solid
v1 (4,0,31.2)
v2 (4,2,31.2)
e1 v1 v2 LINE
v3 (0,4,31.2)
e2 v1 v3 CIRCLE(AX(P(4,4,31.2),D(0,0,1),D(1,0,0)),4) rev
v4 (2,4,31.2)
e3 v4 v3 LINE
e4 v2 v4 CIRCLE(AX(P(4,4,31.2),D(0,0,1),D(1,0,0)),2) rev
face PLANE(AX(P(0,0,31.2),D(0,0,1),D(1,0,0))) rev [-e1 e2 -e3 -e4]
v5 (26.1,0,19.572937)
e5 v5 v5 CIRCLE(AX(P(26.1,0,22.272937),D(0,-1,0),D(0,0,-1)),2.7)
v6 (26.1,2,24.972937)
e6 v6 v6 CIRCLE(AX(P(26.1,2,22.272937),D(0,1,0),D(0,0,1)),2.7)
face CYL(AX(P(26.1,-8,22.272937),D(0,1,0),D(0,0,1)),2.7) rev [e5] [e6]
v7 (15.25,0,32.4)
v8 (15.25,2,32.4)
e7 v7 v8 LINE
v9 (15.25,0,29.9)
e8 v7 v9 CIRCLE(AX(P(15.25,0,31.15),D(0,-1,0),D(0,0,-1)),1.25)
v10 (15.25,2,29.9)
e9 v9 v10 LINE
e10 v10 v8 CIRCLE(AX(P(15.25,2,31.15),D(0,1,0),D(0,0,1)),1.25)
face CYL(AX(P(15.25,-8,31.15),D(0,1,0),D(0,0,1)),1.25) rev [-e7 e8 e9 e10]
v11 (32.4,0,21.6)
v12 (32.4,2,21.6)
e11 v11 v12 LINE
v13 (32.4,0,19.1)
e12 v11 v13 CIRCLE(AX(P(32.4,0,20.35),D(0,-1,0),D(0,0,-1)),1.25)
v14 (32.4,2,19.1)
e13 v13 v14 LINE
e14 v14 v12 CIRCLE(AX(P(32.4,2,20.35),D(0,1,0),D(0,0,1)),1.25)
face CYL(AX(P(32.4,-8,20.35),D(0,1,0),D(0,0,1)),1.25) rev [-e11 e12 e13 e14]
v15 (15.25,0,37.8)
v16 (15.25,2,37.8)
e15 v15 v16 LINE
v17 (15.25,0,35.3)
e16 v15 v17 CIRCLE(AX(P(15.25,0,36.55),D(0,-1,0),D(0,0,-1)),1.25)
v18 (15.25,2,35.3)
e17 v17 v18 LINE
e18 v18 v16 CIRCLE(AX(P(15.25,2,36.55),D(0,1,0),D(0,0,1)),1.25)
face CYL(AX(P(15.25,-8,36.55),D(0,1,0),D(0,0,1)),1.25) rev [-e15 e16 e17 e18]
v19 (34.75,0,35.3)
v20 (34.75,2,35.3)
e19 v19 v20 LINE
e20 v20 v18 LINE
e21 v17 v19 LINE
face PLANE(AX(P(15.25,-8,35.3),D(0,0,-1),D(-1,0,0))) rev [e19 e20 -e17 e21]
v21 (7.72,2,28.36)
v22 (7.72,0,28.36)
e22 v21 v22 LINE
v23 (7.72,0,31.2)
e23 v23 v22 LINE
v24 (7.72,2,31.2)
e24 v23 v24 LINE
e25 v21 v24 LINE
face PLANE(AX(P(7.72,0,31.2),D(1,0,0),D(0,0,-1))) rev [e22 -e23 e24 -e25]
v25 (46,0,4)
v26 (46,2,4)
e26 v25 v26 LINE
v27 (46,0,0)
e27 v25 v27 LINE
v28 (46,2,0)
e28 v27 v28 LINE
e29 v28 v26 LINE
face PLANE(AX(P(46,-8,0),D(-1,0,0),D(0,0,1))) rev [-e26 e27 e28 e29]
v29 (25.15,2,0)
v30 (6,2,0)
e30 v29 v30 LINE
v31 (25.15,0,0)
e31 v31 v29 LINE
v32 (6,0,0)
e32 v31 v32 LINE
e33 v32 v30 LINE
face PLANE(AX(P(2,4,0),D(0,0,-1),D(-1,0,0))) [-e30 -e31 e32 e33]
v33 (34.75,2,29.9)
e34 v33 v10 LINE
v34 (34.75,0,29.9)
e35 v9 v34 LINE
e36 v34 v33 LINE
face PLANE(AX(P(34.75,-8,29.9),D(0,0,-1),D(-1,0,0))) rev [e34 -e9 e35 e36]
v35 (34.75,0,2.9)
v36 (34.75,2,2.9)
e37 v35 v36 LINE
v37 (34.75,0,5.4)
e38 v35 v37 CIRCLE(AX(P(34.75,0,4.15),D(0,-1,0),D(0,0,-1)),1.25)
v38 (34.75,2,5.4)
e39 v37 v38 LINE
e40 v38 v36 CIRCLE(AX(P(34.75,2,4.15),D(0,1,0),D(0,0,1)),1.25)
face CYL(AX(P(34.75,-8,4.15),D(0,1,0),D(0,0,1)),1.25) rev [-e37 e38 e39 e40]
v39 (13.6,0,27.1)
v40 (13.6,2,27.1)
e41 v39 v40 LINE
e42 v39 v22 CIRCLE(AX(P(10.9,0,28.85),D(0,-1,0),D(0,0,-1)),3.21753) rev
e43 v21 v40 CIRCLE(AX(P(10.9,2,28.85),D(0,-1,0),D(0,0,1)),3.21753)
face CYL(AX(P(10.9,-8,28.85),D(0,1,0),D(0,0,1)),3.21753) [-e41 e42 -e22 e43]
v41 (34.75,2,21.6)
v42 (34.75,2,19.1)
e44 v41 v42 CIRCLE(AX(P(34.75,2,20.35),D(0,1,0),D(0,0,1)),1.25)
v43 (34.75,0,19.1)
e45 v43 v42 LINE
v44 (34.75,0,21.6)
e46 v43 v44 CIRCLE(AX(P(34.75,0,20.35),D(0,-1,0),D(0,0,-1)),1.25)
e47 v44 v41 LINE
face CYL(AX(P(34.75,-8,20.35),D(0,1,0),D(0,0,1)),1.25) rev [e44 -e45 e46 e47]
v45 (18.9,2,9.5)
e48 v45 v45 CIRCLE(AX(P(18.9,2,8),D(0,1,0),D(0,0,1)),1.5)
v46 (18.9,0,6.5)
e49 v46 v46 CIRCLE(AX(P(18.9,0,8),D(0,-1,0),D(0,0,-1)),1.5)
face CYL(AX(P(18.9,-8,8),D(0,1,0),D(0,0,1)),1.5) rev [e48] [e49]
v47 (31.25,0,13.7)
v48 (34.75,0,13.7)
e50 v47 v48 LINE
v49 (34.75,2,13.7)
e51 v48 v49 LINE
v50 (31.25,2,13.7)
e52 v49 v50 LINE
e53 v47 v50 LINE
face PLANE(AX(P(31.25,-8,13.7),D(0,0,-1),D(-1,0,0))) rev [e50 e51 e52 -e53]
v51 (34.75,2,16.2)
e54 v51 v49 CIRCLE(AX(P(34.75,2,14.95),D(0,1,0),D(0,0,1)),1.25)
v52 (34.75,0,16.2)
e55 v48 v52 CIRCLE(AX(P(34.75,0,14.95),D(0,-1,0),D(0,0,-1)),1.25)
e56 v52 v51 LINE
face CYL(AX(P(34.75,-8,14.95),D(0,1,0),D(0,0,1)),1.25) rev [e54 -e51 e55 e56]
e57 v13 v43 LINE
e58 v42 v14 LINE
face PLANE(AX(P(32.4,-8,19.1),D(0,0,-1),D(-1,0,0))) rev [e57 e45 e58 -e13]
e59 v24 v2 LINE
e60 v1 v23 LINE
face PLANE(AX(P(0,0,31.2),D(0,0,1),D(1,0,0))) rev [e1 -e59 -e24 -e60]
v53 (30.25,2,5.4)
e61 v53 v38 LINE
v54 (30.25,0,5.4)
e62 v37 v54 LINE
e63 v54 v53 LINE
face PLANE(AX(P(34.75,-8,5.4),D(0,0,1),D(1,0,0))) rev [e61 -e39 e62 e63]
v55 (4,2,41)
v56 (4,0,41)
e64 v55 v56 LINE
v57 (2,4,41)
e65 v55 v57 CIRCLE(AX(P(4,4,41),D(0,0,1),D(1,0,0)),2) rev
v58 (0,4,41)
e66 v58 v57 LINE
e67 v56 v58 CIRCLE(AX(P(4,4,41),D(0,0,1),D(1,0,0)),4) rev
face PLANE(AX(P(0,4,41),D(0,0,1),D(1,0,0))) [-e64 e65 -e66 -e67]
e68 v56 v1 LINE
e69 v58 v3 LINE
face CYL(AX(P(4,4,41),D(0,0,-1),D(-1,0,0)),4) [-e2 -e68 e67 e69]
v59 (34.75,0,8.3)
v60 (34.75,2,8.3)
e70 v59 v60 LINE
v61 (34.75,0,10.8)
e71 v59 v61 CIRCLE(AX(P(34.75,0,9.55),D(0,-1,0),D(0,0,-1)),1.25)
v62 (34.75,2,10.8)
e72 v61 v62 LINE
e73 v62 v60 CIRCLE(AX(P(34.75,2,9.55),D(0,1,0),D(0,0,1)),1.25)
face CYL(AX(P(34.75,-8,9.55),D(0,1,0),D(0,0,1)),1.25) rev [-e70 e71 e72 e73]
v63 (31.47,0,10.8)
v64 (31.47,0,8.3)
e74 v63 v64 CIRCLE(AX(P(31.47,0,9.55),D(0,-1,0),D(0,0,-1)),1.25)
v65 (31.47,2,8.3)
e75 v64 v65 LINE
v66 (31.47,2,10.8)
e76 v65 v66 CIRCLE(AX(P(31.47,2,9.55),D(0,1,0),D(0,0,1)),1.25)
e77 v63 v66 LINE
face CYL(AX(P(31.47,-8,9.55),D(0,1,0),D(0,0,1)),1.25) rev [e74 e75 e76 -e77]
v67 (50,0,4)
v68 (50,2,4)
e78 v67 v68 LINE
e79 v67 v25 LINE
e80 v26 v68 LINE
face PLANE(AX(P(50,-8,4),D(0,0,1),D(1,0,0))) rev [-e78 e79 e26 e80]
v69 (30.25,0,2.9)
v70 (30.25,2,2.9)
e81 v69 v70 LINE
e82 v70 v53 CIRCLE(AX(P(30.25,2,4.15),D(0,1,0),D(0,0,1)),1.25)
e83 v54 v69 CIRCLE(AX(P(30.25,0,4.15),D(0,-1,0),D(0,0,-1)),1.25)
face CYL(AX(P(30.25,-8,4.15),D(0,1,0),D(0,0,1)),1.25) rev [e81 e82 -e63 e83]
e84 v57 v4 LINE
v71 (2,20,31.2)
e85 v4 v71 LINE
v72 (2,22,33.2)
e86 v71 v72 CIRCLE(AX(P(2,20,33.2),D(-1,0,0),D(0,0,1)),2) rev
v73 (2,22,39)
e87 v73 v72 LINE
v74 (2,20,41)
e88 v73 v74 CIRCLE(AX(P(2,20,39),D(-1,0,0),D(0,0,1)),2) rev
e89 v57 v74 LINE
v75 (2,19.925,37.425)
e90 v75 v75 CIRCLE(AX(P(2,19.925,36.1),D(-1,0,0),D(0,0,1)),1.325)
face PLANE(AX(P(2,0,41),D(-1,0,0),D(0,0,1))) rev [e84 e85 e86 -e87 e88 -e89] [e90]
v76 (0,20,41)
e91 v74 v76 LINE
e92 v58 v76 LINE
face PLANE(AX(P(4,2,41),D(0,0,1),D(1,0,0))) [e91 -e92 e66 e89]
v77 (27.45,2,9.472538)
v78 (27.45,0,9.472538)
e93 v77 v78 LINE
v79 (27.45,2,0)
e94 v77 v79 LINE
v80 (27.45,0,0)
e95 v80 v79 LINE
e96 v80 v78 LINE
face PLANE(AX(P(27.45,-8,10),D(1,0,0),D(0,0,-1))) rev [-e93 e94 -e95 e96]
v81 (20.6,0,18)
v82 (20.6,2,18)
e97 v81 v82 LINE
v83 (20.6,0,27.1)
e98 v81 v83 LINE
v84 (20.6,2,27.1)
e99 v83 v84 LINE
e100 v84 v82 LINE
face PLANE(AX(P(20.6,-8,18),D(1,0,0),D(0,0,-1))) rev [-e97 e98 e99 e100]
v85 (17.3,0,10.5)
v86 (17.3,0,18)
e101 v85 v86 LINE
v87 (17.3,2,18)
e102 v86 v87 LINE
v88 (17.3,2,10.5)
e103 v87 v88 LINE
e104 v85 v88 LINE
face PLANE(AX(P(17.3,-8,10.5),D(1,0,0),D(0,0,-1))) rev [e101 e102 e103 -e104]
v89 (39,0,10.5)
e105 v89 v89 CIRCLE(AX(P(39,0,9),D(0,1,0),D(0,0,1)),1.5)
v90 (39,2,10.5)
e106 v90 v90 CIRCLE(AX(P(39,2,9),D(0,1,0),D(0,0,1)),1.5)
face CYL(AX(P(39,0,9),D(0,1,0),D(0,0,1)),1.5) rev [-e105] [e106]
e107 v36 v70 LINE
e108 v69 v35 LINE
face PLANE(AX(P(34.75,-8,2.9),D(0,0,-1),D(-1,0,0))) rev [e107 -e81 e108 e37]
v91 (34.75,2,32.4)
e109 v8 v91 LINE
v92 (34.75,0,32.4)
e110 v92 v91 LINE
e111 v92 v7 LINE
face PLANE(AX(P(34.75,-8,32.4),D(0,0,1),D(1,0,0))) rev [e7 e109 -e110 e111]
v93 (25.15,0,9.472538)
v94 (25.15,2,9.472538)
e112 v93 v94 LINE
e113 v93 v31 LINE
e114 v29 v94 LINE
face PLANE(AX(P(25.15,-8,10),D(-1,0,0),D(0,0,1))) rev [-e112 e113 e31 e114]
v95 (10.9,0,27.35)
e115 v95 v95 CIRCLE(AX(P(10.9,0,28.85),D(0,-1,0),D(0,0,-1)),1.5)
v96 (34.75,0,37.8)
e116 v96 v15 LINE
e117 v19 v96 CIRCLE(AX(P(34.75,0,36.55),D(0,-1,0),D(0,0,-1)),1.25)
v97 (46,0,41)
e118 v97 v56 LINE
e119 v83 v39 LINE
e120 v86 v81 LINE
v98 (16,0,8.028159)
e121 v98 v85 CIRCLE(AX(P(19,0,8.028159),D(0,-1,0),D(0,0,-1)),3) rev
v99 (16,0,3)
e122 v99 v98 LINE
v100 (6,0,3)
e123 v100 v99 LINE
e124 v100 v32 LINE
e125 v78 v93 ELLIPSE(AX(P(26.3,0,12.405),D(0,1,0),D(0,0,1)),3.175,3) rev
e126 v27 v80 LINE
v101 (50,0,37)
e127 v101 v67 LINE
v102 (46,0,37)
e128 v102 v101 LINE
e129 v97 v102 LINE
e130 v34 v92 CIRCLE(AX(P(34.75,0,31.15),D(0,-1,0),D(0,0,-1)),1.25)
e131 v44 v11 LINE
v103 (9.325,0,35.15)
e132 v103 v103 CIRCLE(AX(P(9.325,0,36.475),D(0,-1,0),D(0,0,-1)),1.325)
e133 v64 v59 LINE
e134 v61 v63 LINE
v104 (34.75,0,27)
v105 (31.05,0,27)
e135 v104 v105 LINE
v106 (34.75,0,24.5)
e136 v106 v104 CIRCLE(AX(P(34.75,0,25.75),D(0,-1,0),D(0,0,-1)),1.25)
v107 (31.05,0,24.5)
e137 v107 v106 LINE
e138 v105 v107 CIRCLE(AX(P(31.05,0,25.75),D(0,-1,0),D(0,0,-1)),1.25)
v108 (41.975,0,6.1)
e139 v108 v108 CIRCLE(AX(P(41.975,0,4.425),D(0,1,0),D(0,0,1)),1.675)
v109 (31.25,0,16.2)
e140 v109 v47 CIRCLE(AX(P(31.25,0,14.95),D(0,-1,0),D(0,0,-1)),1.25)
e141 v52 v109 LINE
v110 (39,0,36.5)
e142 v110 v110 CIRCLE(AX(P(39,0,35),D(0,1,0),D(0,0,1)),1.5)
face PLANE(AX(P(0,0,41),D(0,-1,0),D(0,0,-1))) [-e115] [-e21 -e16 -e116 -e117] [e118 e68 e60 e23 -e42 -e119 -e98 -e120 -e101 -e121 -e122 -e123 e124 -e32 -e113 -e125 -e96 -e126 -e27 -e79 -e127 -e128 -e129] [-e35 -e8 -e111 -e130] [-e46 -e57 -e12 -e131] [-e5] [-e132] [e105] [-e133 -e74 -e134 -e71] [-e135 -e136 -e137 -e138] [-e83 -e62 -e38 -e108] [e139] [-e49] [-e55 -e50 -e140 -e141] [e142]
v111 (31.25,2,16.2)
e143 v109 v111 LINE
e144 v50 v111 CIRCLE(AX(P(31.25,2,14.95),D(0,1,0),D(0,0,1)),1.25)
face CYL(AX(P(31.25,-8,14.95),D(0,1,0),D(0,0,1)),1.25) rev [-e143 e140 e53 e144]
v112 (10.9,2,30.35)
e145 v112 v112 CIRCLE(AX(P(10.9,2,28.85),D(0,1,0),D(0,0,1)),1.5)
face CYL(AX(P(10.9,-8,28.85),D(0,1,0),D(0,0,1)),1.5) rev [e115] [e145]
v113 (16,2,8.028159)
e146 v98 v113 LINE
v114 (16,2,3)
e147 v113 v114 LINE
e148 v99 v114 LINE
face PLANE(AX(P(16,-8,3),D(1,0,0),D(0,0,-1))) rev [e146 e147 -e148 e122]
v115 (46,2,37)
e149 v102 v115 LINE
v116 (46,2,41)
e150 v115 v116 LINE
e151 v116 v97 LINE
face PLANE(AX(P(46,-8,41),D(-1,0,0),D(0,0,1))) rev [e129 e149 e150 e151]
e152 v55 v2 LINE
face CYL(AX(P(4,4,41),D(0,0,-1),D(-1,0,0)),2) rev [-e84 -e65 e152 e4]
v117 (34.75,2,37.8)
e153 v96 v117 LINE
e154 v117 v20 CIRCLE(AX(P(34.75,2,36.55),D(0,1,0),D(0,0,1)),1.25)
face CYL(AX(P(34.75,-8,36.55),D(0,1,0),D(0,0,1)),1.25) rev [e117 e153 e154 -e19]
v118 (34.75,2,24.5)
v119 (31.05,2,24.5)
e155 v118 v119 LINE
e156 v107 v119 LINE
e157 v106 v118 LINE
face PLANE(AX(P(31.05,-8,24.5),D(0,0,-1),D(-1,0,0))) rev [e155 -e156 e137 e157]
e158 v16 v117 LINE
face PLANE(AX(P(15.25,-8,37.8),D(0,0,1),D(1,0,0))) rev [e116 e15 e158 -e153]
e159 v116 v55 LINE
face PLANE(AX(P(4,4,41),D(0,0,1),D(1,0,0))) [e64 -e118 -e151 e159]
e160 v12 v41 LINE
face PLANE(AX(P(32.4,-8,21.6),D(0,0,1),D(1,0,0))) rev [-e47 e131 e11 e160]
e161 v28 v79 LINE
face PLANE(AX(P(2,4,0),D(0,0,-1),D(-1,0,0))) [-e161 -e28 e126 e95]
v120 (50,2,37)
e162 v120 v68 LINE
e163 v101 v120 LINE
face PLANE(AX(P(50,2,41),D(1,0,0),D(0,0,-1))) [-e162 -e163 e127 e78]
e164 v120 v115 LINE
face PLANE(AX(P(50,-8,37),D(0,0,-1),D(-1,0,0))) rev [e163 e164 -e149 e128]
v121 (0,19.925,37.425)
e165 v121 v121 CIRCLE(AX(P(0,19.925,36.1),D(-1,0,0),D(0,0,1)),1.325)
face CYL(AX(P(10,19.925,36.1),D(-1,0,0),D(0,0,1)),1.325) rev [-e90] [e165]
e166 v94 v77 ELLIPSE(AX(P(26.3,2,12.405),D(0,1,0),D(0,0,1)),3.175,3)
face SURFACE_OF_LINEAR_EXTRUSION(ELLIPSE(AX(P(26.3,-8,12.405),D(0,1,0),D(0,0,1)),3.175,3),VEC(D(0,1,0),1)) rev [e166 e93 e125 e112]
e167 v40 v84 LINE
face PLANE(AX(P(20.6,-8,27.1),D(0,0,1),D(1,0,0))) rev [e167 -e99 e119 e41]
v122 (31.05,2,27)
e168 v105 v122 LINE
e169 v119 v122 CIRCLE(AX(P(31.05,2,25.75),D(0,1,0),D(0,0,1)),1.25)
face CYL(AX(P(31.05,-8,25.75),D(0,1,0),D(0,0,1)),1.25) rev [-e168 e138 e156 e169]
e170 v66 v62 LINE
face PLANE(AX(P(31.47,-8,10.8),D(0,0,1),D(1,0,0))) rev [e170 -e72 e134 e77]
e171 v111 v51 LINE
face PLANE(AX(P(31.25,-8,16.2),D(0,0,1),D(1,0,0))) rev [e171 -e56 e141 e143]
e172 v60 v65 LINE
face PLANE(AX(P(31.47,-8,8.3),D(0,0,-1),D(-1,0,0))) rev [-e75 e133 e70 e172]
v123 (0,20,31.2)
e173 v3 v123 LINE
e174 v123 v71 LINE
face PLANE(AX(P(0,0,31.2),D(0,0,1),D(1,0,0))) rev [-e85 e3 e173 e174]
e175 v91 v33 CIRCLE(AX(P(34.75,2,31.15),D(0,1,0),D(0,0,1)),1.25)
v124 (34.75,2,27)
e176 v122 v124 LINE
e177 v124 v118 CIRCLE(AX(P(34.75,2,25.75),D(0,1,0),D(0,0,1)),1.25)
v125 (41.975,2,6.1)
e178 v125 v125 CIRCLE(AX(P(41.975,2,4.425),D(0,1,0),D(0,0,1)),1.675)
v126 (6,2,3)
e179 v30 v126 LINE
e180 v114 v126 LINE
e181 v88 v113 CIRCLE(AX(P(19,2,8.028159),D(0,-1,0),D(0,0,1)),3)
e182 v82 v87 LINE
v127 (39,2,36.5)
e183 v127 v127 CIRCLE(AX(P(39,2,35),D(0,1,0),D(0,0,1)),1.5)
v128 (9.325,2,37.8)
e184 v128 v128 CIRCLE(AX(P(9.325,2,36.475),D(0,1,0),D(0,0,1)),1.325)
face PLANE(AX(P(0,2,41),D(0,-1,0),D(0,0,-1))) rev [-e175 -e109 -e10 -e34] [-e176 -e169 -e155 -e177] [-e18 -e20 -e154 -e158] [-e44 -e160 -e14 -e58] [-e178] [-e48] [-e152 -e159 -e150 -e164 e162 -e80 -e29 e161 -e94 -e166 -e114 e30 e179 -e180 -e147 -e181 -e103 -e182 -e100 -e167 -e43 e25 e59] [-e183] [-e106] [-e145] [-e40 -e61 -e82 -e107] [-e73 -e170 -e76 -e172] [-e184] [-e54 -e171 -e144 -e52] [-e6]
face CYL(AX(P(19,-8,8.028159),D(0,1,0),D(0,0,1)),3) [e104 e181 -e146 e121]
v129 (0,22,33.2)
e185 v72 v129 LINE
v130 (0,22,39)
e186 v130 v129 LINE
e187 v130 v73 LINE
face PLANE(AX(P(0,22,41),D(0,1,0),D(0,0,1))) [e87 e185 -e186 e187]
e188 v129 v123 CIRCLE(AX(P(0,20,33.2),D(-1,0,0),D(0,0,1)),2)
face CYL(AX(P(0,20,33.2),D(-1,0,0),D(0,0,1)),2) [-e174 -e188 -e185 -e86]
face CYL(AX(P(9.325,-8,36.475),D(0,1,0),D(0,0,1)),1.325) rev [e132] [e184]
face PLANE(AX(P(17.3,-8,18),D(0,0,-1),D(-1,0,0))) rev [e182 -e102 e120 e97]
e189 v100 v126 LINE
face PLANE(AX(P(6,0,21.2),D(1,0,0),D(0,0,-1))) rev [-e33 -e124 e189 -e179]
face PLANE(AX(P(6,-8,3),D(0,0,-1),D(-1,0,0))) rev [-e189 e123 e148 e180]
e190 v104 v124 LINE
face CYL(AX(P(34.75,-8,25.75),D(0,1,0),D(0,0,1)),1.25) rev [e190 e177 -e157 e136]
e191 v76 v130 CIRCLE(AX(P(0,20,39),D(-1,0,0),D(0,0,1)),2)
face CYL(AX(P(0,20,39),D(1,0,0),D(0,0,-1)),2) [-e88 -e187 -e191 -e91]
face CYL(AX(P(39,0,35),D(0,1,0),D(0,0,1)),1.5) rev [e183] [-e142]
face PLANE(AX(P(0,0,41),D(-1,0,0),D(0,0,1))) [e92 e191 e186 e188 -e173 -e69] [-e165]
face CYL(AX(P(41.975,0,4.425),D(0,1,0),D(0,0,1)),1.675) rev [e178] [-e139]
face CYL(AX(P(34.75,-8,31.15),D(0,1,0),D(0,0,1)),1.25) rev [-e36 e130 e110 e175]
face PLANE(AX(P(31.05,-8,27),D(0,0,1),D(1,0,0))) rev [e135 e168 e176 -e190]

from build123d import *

# Parameters (mm, degrees)
SM_BASE_FLANGE_1_DEPTH   = 41
SKETCH_6_W               = 4
SKETCH_6_H               = 4
CUT_EXTRUDE_1_DEPTH      = 10
SKETCH_7_R               = 1.5
SKETCH_7_R_2             = 1.675
CUT_EXTRUDE_2_DEPTH      = 68.683085036
CUT_EXTRUDE_3_DEPTH      = 10
SKETCH_9_R               = 1.325
SKETCH_9_R_2             = 1.5
CUT_EXTRUDE_4_DEPTH      = 10
CUT_EXTRUDE_5_DEPTH      = 68.683085036
CUT_EXTRUDE_5_DEPTH_BACK = 68.683085036
SKETCH_10_W              = 7.72
SKETCH_10_H              = 10
CUT_EXTRUDE_6_DEPTH      = 68.683085036
CUT_EXTRUDE_6_DEPTH_BACK = 68.683085036
SKETCH_11_W              = 6
SKETCH_11_H              = 21.2
CUT_EXTRUDE_7_DEPTH      = 10
SKETCH_14_RX             = 3.175
SKETCH_14_RY             = 3
CUT_EXTRUDE_8_DEPTH      = 10
SKETCH_15_W              = 2.3
SKETCH_15_H              = 10
CUT_EXTRUDE_9_DEPTH      = 10
SKETCH_16_R              = 2.7
CUT_EXTRUDE_10_DEPTH     = 10
FILLET_1_R               = 2
SKETCH_17_R              = 1.325
CUT_EXTRUDE_11_DEPTH     = 10


# Sheet-metal steps are written as plain solids
with BuildPart() as part:
    # Sketch 1 → Базовая кромка1 (new body)
    with BuildSketch(Plane.XY):
        with BuildLine():
            Line((0, 22), (0, 4))
            ThreePointArc((0, 4), (1.171572875, 1.171572875), (4, 0))
            Line((4, 0), (50, 0))
            Line((50, 0), (50, 2))
            Line((50, 2), (4, 2))
            ThreePointArc((4, 2), (2.585786438, 2.585786438), (2, 4))
            Line((2, 4), (2, 22))
            Line((2, 22), (0, 22))
        make_face()
    extrude(amount=SM_BASE_FLANGE_1_DEPTH)

    # Эскиз6 → Вырез-Вытянуть1 (cut)
    with BuildSketch(Plane(origin=(0, 2, 0), x_dir=(1, 0, 0), z_dir=(0, 1, 0))):
        with Locations((48, -39)):
            Rectangle(SKETCH_6_W, SKETCH_6_H)
        with Locations((48, -2)):
            Rectangle(SKETCH_6_W, SKETCH_6_H)
    extrude(amount=-CUT_EXTRUDE_1_DEPTH, mode=Mode.SUBTRACT)

    # Эскиз7 → Вырез-Вытянуть2 (cut, through all)
    with BuildSketch(Plane(origin=(0, 2, 0), x_dir=(1, 0, 0), z_dir=(0, 1, 0))):
        with Locations(Location((39, -35, 0), (0, 0, 270))):
            Circle(SKETCH_7_R)
        with Locations(Location((39, -9, 0), (0, 0, 270))):
            Circle(SKETCH_7_R)
        with Locations(Location((41.975, -4.425, 0), (0, 0, 270))):
            Circle(SKETCH_7_R_2)
    extrude(amount=-CUT_EXTRUDE_2_DEPTH, mode=Mode.SUBTRACT)

    # Эскиз8 → Вырез-Вытянуть3 (cut)
    with BuildSketch(Plane(origin=(0, 2, 0), x_dir=(1, 0, 0), z_dir=(0, 1, 0))):
        with BuildLine():
            Line((34.75, -5.4), (30.25, -5.4))
            ThreePointArc((30.25, -5.4), (29, -4.15), (30.25, -2.9))
            Line((30.25, -2.9), (34.75, -2.9))
            ThreePointArc((34.75, -2.9), (36, -4.15), (34.75, -5.4))
        make_face()
        with BuildLine():
            Line((31.47, -8.3), (34.75, -8.3))
            ThreePointArc((34.75, -8.3), (36, -9.55), (34.75, -10.8))
            Line((34.75, -10.8), (31.47, -10.8))
            ThreePointArc((31.47, -10.8), (30.22, -9.55), (31.47, -8.3))
        make_face()
        with BuildLine():
            Line((31.25, -13.7), (34.75, -13.7))
            ThreePointArc((34.75, -13.7), (36, -14.95), (34.75, -16.2))
            Line((34.75, -16.2), (31.25, -16.2))
            ThreePointArc((31.25, -16.2), (30, -14.95), (31.25, -13.7))
        make_face()
        with BuildLine():
            Line((32.4, -19.1), (34.75, -19.1))
            ThreePointArc((34.75, -19.1), (36, -20.35), (34.75, -21.6))
            Line((34.75, -21.6), (32.4, -21.6))
            ThreePointArc((32.4, -21.6), (31.15, -20.35), (32.4, -19.1))
        make_face()
        with BuildLine():
            Line((31.05, -24.5), (34.75, -24.5))
            ThreePointArc((34.75, -24.5), (36, -25.75), (34.75, -27))
            Line((34.75, -27), (31.05, -27))
            ThreePointArc((31.05, -27), (29.8, -25.75), (31.05, -24.5))
        make_face()
        with BuildLine():
            Line((34.75, -32.4), (15.25, -32.4))
            ThreePointArc((15.25, -32.4), (14, -31.15), (15.25, -29.9))
            Line((15.25, -29.9), (34.75, -29.9))
            ThreePointArc((34.75, -29.9), (36, -31.15), (34.75, -32.4))
        make_face()
        with BuildLine():
            Line((15.25, -35.3), (34.75, -35.3))
            ThreePointArc((34.75, -35.3), (36, -36.55), (34.75, -37.8))
            Line((34.75, -37.8), (15.25, -37.8))
            ThreePointArc((15.25, -37.8), (14, -36.55), (15.25, -35.3))
        make_face()
    extrude(amount=-CUT_EXTRUDE_3_DEPTH, mode=Mode.SUBTRACT)

    # Эскиз9 → Вырез-Вытянуть4 (cut)
    with BuildSketch(Plane(origin=(0, 2, 0), x_dir=(1, 0, 0), z_dir=(0, 1, 0))):
        with Locations(Location((9.325, -36.475, 0), (0, 0, 270))):
            Circle(SKETCH_9_R)
        with Locations(Location((10.9, -28.85, 0), (0, 0, 270))):
            Circle(SKETCH_9_R_2)
        with Locations(Location((18.9, -8, 0), (0, 0, 270))):
            Circle(SKETCH_9_R_2)
    extrude(amount=-CUT_EXTRUDE_4_DEPTH, mode=Mode.SUBTRACT)

    # Эскиз10 → Вырез-Вытянуть5 (cut, two sides: drawn at the far end of the back side and taken through both)
    with BuildSketch(Plane(origin=(0, 2, 0), x_dir=(1, 0, 0), z_dir=(0, 1, 0)).offset(-CUT_EXTRUDE_5_DEPTH_BACK)):
        with Locations((3.86, -26.2)):
            Rectangle(SKETCH_10_W, SKETCH_10_H)
    extrude(amount=CUT_EXTRUDE_5_DEPTH + CUT_EXTRUDE_5_DEPTH_BACK, mode=Mode.SUBTRACT)

    # Эскиз11 → Вырез-Вытянуть6 (cut, two sides: drawn at the far end of the back side and taken through both)
    with BuildSketch(Plane(origin=(0, 2, 0), x_dir=(1, 0, 0), z_dir=(0, 1, 0)).offset(-CUT_EXTRUDE_6_DEPTH_BACK)):
        with Locations((3, -10.6)):
            Rectangle(SKETCH_11_W, SKETCH_11_H)
    extrude(amount=CUT_EXTRUDE_6_DEPTH + CUT_EXTRUDE_6_DEPTH_BACK, mode=Mode.SUBTRACT)

    # Эскиз12 → Вырез-Вытянуть7 (cut)
    with BuildSketch(Plane(origin=(0, 2, 0), x_dir=(1, 0, 0), z_dir=(0, 1, 0))):
        with BuildLine():
            Line((6, -3), (16, -3))
            Line((16, -3), (16, -8.028158581))
            ThreePointArc((16, -8.028158581), (16.344816391, -9.424582586), (17.3, -10.5))
            Line((17.3, -10.5), (17.3, -18))
            Line((17.3, -18), (20.6, -18))
            Line((20.6, -18), (20.6, -27.1))
            Line((20.6, -27.1), (13.6, -27.1))
            ThreePointArc((13.6, -27.1), (10.225833848, -25.703891292), (7.72, -28.36))
            Line((7.72, -28.36), (0.805596241, -28.36))
            Line((0.805596241, -28.36), (0.805596241, -3))
            Line((0.805596241, -3), (6, -3))
        make_face()
    extrude(amount=-CUT_EXTRUDE_7_DEPTH, mode=Mode.SUBTRACT)

    # Эскиз14 → Вырез-Вытянуть8 (cut)
    with BuildSketch(Plane(origin=(0, 2, 0), x_dir=(1, 0, 0), z_dir=(0, 1, 0))):
        with Locations(Location((26.3, -12.405), (0, 0, -90))):
            Ellipse(SKETCH_14_RX, SKETCH_14_RY)
    extrude(amount=-CUT_EXTRUDE_8_DEPTH, mode=Mode.SUBTRACT)

    # Эскиз15 → Вырез-Вытянуть9 (cut)
    with BuildSketch(Plane(origin=(0, 2, 0), x_dir=(1, 0, 0), z_dir=(0, 1, 0))):
        with Locations((26.3, -5)):
            Rectangle(SKETCH_15_W, SKETCH_15_H)
    extrude(amount=-CUT_EXTRUDE_9_DEPTH, mode=Mode.SUBTRACT)

    # Эскиз16 → Вырез-Вытянуть10 (cut)
    with BuildSketch(Plane(origin=(0, 2, 0), x_dir=(1, 0, 0), z_dir=(0, 1, 0))):
        with Locations(Location((26.1, -22.272936587, 0), (0, 0, 270))):
            Circle(SKETCH_16_R)
    extrude(amount=-CUT_EXTRUDE_10_DEPTH, mode=Mode.SUBTRACT)

    # Скругление1
    fillet_1_edges = [part.edges().sort_by_distance(p)[0] for p in [
        (1, 22, 31.2),
        (1, 22, 41),
    ]]
    fillet(fillet_1_edges, radius=FILLET_1_R)

    # Эскиз17 → Вырез-Вытянуть11 (cut)
    with BuildSketch(Plane.ZY):
        with Locations((36.1, 19.925)):
            Circle(SKETCH_17_R)
    extrude(amount=-CUT_EXTRUDE_11_DEPTH, mode=Mode.SUBTRACT)


solid = part.part
